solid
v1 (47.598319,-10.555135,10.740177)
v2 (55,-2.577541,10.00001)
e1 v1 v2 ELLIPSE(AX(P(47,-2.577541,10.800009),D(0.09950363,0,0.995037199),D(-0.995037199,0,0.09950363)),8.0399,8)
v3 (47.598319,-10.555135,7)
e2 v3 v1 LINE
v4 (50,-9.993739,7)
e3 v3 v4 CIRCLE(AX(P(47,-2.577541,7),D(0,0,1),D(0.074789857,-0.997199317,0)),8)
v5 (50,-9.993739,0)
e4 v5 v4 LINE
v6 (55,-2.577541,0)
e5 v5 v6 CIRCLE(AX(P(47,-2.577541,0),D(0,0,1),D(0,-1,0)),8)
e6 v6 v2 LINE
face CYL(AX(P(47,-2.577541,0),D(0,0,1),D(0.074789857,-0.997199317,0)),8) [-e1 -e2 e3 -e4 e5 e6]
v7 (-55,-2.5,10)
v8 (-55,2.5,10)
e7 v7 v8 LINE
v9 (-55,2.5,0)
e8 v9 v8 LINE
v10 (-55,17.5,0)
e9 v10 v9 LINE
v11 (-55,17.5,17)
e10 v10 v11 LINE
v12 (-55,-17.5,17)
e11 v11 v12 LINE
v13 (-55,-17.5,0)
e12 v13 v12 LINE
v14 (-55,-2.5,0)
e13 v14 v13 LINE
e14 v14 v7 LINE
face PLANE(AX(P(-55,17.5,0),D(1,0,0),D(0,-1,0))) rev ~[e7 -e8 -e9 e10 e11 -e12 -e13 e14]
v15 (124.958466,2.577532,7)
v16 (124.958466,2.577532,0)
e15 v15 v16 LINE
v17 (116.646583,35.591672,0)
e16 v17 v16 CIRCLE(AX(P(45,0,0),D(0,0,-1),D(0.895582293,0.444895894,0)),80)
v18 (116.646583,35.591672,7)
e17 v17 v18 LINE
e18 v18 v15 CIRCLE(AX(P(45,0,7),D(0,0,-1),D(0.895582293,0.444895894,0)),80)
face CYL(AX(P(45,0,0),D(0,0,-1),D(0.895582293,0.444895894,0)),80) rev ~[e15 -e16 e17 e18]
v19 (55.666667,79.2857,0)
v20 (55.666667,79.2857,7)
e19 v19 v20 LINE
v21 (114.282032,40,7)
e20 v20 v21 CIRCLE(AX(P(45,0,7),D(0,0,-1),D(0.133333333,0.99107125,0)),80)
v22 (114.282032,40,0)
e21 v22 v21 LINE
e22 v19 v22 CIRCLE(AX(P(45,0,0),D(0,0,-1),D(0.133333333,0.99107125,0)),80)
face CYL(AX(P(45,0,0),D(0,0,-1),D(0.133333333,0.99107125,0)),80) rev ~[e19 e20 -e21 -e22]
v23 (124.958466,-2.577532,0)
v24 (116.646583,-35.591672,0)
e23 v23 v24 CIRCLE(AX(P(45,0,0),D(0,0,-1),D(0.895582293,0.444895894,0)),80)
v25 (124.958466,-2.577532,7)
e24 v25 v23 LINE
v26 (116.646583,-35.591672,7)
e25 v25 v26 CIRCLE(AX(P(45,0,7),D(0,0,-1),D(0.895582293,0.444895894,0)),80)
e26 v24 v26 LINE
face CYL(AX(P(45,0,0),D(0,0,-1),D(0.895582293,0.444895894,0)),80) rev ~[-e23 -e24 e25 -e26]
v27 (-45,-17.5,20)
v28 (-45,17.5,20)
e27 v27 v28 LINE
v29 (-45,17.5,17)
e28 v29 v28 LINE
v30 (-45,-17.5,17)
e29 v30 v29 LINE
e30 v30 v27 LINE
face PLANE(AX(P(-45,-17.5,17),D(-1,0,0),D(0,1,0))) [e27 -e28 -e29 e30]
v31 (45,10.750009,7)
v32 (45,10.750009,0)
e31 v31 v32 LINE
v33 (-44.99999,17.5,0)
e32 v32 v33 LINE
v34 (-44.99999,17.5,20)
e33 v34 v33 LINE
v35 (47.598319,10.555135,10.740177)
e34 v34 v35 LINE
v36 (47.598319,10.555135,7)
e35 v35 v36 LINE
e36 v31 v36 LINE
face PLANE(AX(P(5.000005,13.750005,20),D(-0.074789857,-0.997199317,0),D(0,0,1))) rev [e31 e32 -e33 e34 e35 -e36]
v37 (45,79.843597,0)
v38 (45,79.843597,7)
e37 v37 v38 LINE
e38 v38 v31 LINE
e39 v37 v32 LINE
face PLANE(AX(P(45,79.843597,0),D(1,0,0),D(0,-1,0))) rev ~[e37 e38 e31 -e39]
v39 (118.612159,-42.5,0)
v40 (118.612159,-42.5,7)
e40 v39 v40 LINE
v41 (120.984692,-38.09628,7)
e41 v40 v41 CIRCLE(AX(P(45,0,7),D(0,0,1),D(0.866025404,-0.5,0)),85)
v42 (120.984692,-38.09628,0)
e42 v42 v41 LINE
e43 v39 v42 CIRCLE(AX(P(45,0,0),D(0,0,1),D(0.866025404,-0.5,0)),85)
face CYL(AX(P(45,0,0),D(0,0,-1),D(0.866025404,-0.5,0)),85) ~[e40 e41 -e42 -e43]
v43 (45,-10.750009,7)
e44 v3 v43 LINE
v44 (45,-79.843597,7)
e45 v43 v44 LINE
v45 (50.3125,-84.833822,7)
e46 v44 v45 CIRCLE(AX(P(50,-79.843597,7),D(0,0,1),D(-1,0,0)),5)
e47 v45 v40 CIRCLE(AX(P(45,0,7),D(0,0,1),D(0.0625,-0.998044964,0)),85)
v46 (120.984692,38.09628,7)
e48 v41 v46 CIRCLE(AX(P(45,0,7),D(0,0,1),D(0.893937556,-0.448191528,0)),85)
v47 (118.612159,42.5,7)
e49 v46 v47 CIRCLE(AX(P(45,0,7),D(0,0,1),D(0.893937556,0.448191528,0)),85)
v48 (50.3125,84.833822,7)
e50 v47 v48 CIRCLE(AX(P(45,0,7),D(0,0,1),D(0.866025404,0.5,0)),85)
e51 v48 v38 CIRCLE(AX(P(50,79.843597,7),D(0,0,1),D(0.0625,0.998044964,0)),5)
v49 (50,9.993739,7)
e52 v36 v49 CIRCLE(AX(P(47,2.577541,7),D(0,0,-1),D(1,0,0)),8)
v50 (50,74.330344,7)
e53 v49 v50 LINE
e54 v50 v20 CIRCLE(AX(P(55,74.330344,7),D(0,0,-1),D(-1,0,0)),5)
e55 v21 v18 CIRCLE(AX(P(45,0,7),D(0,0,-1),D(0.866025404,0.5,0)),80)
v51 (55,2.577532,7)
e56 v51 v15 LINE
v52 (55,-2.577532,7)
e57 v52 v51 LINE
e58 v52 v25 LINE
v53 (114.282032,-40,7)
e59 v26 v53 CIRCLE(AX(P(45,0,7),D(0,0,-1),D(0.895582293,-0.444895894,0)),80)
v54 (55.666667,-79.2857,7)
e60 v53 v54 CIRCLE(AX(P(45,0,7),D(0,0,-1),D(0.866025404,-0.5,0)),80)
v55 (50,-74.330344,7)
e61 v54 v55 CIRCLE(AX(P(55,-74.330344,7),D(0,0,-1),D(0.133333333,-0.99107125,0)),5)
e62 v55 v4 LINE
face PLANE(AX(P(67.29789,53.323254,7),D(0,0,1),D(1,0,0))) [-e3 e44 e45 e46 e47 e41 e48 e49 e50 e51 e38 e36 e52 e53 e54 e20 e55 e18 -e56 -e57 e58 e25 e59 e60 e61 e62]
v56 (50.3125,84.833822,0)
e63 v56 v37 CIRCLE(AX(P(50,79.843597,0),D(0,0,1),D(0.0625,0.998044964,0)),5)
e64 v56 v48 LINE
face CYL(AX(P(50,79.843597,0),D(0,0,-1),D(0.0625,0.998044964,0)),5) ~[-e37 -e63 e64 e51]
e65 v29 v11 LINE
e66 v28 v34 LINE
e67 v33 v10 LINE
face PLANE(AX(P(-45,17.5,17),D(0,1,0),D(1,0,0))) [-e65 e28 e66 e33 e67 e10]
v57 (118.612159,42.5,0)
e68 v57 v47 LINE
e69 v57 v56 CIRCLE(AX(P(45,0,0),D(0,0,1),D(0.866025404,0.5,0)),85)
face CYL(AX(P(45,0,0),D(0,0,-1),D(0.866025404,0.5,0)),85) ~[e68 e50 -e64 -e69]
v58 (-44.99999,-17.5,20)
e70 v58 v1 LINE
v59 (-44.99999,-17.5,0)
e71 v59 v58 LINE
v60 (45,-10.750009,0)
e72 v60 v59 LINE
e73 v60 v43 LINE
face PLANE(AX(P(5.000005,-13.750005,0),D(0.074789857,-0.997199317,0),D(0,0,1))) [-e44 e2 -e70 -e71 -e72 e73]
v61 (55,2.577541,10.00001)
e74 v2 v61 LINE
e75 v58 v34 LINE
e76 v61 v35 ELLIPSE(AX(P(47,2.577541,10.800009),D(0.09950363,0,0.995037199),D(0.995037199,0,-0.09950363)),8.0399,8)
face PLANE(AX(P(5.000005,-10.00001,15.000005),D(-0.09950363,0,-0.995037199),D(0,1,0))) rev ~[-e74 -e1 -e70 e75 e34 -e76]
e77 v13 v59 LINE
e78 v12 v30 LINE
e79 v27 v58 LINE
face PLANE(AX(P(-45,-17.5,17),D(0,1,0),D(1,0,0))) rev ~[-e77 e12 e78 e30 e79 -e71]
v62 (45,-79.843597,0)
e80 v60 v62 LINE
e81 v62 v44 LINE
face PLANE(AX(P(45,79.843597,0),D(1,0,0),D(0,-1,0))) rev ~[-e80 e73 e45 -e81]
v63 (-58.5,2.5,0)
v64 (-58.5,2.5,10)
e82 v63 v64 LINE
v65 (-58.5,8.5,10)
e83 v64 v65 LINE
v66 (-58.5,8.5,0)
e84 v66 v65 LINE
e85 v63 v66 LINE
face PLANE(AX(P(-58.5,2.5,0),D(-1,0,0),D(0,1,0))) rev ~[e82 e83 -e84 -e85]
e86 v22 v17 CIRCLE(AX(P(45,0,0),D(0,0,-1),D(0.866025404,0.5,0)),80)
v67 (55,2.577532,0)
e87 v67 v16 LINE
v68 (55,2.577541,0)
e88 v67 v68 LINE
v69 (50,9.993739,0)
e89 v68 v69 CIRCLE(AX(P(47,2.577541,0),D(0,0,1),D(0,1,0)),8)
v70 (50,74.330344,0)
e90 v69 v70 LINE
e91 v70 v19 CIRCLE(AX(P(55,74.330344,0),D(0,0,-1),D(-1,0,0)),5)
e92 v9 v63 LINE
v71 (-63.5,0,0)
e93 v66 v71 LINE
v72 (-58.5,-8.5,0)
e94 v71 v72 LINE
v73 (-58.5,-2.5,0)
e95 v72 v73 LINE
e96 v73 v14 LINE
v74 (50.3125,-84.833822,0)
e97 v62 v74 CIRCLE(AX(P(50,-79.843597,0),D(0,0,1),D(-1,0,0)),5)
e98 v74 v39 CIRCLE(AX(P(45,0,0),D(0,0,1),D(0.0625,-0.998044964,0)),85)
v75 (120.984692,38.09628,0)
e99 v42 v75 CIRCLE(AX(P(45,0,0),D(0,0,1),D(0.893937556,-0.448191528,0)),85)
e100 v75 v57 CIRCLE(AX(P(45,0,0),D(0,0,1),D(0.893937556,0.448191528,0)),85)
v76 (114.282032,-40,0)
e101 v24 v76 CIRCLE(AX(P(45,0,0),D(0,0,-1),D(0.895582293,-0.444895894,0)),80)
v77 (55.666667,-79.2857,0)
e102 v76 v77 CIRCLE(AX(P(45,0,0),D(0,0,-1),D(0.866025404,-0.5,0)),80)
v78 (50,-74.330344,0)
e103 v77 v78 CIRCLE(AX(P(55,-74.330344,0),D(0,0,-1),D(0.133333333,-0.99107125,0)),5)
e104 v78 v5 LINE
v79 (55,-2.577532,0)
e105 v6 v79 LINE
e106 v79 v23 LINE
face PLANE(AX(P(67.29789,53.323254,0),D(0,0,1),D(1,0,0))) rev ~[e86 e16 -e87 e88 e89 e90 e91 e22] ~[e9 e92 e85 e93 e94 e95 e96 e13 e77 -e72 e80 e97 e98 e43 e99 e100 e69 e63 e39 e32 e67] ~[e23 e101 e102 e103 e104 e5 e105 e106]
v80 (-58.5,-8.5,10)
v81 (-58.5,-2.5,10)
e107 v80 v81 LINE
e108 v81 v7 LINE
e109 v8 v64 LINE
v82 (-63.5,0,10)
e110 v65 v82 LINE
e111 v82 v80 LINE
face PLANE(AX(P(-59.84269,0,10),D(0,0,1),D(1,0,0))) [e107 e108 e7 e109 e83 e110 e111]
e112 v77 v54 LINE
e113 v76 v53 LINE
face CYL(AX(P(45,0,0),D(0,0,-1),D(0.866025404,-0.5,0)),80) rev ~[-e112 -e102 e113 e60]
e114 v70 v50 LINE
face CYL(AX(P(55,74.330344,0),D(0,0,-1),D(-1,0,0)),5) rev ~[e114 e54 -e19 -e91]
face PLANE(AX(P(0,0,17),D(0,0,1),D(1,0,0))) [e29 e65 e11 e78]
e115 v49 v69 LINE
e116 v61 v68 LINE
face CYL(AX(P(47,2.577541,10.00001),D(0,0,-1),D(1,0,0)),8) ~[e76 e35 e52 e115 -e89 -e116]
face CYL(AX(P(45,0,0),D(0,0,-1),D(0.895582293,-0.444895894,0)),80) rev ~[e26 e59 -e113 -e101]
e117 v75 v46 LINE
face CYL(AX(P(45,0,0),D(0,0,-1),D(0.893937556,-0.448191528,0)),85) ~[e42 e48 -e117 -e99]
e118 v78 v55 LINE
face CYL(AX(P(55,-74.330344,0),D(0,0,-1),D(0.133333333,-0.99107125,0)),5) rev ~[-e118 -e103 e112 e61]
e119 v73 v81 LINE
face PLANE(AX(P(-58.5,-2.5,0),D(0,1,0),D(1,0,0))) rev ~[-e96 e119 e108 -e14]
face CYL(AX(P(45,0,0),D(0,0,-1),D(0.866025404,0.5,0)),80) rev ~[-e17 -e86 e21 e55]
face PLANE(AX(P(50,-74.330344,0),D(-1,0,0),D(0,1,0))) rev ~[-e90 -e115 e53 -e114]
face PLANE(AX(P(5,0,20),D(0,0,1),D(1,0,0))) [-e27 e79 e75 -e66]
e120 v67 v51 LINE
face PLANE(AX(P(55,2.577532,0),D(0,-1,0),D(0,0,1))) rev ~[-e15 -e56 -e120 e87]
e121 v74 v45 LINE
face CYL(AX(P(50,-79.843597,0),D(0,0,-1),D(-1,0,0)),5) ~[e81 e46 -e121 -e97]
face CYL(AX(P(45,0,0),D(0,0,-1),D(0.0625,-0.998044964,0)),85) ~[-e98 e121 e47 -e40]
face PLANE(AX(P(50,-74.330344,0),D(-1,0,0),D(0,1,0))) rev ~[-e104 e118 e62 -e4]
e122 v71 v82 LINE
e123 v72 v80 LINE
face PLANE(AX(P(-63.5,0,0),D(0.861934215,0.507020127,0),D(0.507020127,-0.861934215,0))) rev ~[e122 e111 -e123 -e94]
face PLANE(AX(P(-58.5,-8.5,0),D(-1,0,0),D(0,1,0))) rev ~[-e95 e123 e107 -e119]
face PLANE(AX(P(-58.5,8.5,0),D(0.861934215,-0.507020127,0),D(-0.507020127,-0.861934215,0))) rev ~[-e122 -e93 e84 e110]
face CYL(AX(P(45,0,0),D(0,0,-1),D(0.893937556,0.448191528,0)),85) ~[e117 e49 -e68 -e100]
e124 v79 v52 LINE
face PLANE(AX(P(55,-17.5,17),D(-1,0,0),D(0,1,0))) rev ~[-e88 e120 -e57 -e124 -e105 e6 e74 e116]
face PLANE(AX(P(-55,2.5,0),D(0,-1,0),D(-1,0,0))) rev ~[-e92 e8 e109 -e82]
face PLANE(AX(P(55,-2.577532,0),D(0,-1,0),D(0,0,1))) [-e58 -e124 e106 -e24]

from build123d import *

# Parameters (mm, degrees)
F1_DEPTH = 10
F2_DEPTH = 17
F3_W     = 100
F3_H     = 35
F4_DEPTH = 3
F5_SIZE2 = 99.99999
F5_SIZE  = 7.49999
F6_SIZE2 = 9.99999
F6_SIZE  = 99.99999
F7_R     = 8
F9_DEPTH = 7
F10_W    = 5.1550631039
F10_H    = 7


# Not quite as in the source:
# - a fillet or chamfer is up to 0.001 mm smaller than in the source, because OpenCascade refuses the exact size
# - a feature of the source that left no trace in its solid (it failed there, or was rolled back) is left out


with BuildPart() as f1:
    # F0 (on Top) → F1 (new body)
    with BuildSketch(Plane.XY):
        Polygon((-58.5, -8.5), (-58.5, -2.5), (-58.5, 0), (-58.5, 2.5), (-58.5, 8.5), (-63.5, 0), align=None)
        Polygon((-58.5, -2.5), (-55, -2.5), (-55, 2.5), (-58.5, 2.5), (-58.5, 0), align=None)
    extrude(amount=F1_DEPTH)

    # F0 (on Top) → F2 (join)
    with BuildSketch(Plane.XY):
        Polygon((-55, -17.5), (55, -17.5), (55, 17.5), (-55, 17.5), (-55, 2.5), (-55, -2.5), align=None)
    extrude(amount=F2_DEPTH)

    # F3 (on face) → F4 (join)
    with BuildSketch(Plane.XY.offset(17)):
        with Locations((5, 0)):
            Rectangle(F3_W, F3_H)
    extrude(amount=F4_DEPTH)

    # F5 (size 7.5 and 100 in the source; OpenCascade refuses exactly that, so slightly less here)
    f5_edges = [f1.edges().sort_by_distance(p)[0] for p in [
        (55, -17.5, 10),
        (55, 17.5, 10),
    ]]
    f5_side = f1.faces().sort_by_distance((55, 0, 10))[0]
    chamfer(f5_edges, length=F5_SIZE, length2=F5_SIZE2, reference=f5_side)

    # F6 (size 100 and 10 in the source; OpenCascade refuses exactly that, so slightly less here)
    f6_edges = [f1.edges().sort_by_distance(p)[0] for p in [
        (55, 0, 20),
    ]]
    chamfer(f6_edges, length=F6_SIZE, length2=F6_SIZE2)

    # F7
    f7_edges = [f1.edges().sort_by_distance(p)[0] for p in [
        (55, -10.00001, 5.000005),
        (55, 10.00001, 5.000005),
    ]]
    fillet(f7_edges, radius=F7_R)

    # F8 (on face) → F9 (join)
    with BuildSketch(Plane.XY):
        with BuildLine():
            ThreePointArc((118.6121593217, 42.5), (89.7807277981, 72.2473973087), (50.3125, 84.8338219329))
            ThreePointArc((50.3125, 84.8338219329), (46.5767340156, 83.4879420476), (45, 79.8435971134))
            Line((45, 79.8435971134), (45, 0))
            Line((45, 0), (50, 2.8867513459))
            Line((50, 2.8867513459), (50, 74.3303437366))
            ThreePointArc((50, 74.3303437366), (51.708597057, 78.0942070001), (55.6666666667, 79.2856999857))
            ThreePointArc((55.6666666667, 79.2856999857), (89.5397594579, 66.4545696505), (114.2820323028, 40))
            Line((114.2820323028, 40), (118.6121593217, 42.5))
        make_face()
        with BuildLine():
            ThreePointArc((120.9846922835, 38.0962798523), (119.8308271392, 40.3155963576), (118.6121593217, 42.5))
            Line((118.6121593217, 42.5), (114.2820323028, 40))
            ThreePointArc((114.2820323028, 40), (115.4987732023, 37.8143223789), (116.6465834297, 35.5916715378))
            Line((116.6465834297, 35.5916715378), (120.9846922835, 38.0962798523))
        make_face()
        with BuildLine():
            ThreePointArc((120.9846922835, -38.0962798523), (130, 0), (120.9846922835, 38.0962798523))
            Line((120.9846922835, 38.0962798523), (116.6465834297, 35.5916715378))
            ThreePointArc((116.6465834297, 35.5916715378), (125, 0), (116.6465834297, -35.5916715378))
            Line((116.6465834297, -35.5916715378), (120.9846922835, -38.0962798523))
        make_face()
        with BuildLine():
            Line((50, -2.8867513459), (45, 0))
            Line((45, 0), (45, -79.8435971134))
            ThreePointArc((45, -79.8435971134), (46.5767340156, -83.4879420476), (50.3125, -84.8338219329))
            ThreePointArc((50.3125, -84.8338219329), (89.7807277981, -72.2473973087), (118.6121593217, -42.5))
            Line((118.6121593217, -42.5), (114.2820323028, -40))
            ThreePointArc((114.2820323028, -40), (89.5397594579, -66.4545696505), (55.6666666667, -79.2856999857))
            ThreePointArc((55.6666666667, -79.2856999857), (51.708597057, -78.0942070001), (50, -74.3303437366))
            Line((50, -74.3303437366), (50, -2.8867513459))
        make_face()
        Polygon((50, 2.8867513459), (45, 0), (50, -2.8867513459), align=None)
        with BuildLine():
            ThreePointArc((118.6121593217, -42.5), (119.8308271392, -40.3155963576), (120.9846922835, -38.0962798523))
            Line((120.9846922835, -38.0962798523), (116.6465834297, -35.5916715378))
            ThreePointArc((116.6465834297, -35.5916715378), (115.4987732023, -37.8143223789), (114.2820323028, -40))
            Line((114.2820323028, -40), (118.6121593217, -42.5))
        make_face()
    extrude(amount=F9_DEPTH)

    # F10 (on face) → F11 (join, up to the next surface of F1)
    with BuildSketch(Plane.YZ.offset(55)):
        with Locations((0, 3.5)):
            Rectangle(F10_W, F10_H)
    extrude(until=Until.NEXT)


solid = f1.part
